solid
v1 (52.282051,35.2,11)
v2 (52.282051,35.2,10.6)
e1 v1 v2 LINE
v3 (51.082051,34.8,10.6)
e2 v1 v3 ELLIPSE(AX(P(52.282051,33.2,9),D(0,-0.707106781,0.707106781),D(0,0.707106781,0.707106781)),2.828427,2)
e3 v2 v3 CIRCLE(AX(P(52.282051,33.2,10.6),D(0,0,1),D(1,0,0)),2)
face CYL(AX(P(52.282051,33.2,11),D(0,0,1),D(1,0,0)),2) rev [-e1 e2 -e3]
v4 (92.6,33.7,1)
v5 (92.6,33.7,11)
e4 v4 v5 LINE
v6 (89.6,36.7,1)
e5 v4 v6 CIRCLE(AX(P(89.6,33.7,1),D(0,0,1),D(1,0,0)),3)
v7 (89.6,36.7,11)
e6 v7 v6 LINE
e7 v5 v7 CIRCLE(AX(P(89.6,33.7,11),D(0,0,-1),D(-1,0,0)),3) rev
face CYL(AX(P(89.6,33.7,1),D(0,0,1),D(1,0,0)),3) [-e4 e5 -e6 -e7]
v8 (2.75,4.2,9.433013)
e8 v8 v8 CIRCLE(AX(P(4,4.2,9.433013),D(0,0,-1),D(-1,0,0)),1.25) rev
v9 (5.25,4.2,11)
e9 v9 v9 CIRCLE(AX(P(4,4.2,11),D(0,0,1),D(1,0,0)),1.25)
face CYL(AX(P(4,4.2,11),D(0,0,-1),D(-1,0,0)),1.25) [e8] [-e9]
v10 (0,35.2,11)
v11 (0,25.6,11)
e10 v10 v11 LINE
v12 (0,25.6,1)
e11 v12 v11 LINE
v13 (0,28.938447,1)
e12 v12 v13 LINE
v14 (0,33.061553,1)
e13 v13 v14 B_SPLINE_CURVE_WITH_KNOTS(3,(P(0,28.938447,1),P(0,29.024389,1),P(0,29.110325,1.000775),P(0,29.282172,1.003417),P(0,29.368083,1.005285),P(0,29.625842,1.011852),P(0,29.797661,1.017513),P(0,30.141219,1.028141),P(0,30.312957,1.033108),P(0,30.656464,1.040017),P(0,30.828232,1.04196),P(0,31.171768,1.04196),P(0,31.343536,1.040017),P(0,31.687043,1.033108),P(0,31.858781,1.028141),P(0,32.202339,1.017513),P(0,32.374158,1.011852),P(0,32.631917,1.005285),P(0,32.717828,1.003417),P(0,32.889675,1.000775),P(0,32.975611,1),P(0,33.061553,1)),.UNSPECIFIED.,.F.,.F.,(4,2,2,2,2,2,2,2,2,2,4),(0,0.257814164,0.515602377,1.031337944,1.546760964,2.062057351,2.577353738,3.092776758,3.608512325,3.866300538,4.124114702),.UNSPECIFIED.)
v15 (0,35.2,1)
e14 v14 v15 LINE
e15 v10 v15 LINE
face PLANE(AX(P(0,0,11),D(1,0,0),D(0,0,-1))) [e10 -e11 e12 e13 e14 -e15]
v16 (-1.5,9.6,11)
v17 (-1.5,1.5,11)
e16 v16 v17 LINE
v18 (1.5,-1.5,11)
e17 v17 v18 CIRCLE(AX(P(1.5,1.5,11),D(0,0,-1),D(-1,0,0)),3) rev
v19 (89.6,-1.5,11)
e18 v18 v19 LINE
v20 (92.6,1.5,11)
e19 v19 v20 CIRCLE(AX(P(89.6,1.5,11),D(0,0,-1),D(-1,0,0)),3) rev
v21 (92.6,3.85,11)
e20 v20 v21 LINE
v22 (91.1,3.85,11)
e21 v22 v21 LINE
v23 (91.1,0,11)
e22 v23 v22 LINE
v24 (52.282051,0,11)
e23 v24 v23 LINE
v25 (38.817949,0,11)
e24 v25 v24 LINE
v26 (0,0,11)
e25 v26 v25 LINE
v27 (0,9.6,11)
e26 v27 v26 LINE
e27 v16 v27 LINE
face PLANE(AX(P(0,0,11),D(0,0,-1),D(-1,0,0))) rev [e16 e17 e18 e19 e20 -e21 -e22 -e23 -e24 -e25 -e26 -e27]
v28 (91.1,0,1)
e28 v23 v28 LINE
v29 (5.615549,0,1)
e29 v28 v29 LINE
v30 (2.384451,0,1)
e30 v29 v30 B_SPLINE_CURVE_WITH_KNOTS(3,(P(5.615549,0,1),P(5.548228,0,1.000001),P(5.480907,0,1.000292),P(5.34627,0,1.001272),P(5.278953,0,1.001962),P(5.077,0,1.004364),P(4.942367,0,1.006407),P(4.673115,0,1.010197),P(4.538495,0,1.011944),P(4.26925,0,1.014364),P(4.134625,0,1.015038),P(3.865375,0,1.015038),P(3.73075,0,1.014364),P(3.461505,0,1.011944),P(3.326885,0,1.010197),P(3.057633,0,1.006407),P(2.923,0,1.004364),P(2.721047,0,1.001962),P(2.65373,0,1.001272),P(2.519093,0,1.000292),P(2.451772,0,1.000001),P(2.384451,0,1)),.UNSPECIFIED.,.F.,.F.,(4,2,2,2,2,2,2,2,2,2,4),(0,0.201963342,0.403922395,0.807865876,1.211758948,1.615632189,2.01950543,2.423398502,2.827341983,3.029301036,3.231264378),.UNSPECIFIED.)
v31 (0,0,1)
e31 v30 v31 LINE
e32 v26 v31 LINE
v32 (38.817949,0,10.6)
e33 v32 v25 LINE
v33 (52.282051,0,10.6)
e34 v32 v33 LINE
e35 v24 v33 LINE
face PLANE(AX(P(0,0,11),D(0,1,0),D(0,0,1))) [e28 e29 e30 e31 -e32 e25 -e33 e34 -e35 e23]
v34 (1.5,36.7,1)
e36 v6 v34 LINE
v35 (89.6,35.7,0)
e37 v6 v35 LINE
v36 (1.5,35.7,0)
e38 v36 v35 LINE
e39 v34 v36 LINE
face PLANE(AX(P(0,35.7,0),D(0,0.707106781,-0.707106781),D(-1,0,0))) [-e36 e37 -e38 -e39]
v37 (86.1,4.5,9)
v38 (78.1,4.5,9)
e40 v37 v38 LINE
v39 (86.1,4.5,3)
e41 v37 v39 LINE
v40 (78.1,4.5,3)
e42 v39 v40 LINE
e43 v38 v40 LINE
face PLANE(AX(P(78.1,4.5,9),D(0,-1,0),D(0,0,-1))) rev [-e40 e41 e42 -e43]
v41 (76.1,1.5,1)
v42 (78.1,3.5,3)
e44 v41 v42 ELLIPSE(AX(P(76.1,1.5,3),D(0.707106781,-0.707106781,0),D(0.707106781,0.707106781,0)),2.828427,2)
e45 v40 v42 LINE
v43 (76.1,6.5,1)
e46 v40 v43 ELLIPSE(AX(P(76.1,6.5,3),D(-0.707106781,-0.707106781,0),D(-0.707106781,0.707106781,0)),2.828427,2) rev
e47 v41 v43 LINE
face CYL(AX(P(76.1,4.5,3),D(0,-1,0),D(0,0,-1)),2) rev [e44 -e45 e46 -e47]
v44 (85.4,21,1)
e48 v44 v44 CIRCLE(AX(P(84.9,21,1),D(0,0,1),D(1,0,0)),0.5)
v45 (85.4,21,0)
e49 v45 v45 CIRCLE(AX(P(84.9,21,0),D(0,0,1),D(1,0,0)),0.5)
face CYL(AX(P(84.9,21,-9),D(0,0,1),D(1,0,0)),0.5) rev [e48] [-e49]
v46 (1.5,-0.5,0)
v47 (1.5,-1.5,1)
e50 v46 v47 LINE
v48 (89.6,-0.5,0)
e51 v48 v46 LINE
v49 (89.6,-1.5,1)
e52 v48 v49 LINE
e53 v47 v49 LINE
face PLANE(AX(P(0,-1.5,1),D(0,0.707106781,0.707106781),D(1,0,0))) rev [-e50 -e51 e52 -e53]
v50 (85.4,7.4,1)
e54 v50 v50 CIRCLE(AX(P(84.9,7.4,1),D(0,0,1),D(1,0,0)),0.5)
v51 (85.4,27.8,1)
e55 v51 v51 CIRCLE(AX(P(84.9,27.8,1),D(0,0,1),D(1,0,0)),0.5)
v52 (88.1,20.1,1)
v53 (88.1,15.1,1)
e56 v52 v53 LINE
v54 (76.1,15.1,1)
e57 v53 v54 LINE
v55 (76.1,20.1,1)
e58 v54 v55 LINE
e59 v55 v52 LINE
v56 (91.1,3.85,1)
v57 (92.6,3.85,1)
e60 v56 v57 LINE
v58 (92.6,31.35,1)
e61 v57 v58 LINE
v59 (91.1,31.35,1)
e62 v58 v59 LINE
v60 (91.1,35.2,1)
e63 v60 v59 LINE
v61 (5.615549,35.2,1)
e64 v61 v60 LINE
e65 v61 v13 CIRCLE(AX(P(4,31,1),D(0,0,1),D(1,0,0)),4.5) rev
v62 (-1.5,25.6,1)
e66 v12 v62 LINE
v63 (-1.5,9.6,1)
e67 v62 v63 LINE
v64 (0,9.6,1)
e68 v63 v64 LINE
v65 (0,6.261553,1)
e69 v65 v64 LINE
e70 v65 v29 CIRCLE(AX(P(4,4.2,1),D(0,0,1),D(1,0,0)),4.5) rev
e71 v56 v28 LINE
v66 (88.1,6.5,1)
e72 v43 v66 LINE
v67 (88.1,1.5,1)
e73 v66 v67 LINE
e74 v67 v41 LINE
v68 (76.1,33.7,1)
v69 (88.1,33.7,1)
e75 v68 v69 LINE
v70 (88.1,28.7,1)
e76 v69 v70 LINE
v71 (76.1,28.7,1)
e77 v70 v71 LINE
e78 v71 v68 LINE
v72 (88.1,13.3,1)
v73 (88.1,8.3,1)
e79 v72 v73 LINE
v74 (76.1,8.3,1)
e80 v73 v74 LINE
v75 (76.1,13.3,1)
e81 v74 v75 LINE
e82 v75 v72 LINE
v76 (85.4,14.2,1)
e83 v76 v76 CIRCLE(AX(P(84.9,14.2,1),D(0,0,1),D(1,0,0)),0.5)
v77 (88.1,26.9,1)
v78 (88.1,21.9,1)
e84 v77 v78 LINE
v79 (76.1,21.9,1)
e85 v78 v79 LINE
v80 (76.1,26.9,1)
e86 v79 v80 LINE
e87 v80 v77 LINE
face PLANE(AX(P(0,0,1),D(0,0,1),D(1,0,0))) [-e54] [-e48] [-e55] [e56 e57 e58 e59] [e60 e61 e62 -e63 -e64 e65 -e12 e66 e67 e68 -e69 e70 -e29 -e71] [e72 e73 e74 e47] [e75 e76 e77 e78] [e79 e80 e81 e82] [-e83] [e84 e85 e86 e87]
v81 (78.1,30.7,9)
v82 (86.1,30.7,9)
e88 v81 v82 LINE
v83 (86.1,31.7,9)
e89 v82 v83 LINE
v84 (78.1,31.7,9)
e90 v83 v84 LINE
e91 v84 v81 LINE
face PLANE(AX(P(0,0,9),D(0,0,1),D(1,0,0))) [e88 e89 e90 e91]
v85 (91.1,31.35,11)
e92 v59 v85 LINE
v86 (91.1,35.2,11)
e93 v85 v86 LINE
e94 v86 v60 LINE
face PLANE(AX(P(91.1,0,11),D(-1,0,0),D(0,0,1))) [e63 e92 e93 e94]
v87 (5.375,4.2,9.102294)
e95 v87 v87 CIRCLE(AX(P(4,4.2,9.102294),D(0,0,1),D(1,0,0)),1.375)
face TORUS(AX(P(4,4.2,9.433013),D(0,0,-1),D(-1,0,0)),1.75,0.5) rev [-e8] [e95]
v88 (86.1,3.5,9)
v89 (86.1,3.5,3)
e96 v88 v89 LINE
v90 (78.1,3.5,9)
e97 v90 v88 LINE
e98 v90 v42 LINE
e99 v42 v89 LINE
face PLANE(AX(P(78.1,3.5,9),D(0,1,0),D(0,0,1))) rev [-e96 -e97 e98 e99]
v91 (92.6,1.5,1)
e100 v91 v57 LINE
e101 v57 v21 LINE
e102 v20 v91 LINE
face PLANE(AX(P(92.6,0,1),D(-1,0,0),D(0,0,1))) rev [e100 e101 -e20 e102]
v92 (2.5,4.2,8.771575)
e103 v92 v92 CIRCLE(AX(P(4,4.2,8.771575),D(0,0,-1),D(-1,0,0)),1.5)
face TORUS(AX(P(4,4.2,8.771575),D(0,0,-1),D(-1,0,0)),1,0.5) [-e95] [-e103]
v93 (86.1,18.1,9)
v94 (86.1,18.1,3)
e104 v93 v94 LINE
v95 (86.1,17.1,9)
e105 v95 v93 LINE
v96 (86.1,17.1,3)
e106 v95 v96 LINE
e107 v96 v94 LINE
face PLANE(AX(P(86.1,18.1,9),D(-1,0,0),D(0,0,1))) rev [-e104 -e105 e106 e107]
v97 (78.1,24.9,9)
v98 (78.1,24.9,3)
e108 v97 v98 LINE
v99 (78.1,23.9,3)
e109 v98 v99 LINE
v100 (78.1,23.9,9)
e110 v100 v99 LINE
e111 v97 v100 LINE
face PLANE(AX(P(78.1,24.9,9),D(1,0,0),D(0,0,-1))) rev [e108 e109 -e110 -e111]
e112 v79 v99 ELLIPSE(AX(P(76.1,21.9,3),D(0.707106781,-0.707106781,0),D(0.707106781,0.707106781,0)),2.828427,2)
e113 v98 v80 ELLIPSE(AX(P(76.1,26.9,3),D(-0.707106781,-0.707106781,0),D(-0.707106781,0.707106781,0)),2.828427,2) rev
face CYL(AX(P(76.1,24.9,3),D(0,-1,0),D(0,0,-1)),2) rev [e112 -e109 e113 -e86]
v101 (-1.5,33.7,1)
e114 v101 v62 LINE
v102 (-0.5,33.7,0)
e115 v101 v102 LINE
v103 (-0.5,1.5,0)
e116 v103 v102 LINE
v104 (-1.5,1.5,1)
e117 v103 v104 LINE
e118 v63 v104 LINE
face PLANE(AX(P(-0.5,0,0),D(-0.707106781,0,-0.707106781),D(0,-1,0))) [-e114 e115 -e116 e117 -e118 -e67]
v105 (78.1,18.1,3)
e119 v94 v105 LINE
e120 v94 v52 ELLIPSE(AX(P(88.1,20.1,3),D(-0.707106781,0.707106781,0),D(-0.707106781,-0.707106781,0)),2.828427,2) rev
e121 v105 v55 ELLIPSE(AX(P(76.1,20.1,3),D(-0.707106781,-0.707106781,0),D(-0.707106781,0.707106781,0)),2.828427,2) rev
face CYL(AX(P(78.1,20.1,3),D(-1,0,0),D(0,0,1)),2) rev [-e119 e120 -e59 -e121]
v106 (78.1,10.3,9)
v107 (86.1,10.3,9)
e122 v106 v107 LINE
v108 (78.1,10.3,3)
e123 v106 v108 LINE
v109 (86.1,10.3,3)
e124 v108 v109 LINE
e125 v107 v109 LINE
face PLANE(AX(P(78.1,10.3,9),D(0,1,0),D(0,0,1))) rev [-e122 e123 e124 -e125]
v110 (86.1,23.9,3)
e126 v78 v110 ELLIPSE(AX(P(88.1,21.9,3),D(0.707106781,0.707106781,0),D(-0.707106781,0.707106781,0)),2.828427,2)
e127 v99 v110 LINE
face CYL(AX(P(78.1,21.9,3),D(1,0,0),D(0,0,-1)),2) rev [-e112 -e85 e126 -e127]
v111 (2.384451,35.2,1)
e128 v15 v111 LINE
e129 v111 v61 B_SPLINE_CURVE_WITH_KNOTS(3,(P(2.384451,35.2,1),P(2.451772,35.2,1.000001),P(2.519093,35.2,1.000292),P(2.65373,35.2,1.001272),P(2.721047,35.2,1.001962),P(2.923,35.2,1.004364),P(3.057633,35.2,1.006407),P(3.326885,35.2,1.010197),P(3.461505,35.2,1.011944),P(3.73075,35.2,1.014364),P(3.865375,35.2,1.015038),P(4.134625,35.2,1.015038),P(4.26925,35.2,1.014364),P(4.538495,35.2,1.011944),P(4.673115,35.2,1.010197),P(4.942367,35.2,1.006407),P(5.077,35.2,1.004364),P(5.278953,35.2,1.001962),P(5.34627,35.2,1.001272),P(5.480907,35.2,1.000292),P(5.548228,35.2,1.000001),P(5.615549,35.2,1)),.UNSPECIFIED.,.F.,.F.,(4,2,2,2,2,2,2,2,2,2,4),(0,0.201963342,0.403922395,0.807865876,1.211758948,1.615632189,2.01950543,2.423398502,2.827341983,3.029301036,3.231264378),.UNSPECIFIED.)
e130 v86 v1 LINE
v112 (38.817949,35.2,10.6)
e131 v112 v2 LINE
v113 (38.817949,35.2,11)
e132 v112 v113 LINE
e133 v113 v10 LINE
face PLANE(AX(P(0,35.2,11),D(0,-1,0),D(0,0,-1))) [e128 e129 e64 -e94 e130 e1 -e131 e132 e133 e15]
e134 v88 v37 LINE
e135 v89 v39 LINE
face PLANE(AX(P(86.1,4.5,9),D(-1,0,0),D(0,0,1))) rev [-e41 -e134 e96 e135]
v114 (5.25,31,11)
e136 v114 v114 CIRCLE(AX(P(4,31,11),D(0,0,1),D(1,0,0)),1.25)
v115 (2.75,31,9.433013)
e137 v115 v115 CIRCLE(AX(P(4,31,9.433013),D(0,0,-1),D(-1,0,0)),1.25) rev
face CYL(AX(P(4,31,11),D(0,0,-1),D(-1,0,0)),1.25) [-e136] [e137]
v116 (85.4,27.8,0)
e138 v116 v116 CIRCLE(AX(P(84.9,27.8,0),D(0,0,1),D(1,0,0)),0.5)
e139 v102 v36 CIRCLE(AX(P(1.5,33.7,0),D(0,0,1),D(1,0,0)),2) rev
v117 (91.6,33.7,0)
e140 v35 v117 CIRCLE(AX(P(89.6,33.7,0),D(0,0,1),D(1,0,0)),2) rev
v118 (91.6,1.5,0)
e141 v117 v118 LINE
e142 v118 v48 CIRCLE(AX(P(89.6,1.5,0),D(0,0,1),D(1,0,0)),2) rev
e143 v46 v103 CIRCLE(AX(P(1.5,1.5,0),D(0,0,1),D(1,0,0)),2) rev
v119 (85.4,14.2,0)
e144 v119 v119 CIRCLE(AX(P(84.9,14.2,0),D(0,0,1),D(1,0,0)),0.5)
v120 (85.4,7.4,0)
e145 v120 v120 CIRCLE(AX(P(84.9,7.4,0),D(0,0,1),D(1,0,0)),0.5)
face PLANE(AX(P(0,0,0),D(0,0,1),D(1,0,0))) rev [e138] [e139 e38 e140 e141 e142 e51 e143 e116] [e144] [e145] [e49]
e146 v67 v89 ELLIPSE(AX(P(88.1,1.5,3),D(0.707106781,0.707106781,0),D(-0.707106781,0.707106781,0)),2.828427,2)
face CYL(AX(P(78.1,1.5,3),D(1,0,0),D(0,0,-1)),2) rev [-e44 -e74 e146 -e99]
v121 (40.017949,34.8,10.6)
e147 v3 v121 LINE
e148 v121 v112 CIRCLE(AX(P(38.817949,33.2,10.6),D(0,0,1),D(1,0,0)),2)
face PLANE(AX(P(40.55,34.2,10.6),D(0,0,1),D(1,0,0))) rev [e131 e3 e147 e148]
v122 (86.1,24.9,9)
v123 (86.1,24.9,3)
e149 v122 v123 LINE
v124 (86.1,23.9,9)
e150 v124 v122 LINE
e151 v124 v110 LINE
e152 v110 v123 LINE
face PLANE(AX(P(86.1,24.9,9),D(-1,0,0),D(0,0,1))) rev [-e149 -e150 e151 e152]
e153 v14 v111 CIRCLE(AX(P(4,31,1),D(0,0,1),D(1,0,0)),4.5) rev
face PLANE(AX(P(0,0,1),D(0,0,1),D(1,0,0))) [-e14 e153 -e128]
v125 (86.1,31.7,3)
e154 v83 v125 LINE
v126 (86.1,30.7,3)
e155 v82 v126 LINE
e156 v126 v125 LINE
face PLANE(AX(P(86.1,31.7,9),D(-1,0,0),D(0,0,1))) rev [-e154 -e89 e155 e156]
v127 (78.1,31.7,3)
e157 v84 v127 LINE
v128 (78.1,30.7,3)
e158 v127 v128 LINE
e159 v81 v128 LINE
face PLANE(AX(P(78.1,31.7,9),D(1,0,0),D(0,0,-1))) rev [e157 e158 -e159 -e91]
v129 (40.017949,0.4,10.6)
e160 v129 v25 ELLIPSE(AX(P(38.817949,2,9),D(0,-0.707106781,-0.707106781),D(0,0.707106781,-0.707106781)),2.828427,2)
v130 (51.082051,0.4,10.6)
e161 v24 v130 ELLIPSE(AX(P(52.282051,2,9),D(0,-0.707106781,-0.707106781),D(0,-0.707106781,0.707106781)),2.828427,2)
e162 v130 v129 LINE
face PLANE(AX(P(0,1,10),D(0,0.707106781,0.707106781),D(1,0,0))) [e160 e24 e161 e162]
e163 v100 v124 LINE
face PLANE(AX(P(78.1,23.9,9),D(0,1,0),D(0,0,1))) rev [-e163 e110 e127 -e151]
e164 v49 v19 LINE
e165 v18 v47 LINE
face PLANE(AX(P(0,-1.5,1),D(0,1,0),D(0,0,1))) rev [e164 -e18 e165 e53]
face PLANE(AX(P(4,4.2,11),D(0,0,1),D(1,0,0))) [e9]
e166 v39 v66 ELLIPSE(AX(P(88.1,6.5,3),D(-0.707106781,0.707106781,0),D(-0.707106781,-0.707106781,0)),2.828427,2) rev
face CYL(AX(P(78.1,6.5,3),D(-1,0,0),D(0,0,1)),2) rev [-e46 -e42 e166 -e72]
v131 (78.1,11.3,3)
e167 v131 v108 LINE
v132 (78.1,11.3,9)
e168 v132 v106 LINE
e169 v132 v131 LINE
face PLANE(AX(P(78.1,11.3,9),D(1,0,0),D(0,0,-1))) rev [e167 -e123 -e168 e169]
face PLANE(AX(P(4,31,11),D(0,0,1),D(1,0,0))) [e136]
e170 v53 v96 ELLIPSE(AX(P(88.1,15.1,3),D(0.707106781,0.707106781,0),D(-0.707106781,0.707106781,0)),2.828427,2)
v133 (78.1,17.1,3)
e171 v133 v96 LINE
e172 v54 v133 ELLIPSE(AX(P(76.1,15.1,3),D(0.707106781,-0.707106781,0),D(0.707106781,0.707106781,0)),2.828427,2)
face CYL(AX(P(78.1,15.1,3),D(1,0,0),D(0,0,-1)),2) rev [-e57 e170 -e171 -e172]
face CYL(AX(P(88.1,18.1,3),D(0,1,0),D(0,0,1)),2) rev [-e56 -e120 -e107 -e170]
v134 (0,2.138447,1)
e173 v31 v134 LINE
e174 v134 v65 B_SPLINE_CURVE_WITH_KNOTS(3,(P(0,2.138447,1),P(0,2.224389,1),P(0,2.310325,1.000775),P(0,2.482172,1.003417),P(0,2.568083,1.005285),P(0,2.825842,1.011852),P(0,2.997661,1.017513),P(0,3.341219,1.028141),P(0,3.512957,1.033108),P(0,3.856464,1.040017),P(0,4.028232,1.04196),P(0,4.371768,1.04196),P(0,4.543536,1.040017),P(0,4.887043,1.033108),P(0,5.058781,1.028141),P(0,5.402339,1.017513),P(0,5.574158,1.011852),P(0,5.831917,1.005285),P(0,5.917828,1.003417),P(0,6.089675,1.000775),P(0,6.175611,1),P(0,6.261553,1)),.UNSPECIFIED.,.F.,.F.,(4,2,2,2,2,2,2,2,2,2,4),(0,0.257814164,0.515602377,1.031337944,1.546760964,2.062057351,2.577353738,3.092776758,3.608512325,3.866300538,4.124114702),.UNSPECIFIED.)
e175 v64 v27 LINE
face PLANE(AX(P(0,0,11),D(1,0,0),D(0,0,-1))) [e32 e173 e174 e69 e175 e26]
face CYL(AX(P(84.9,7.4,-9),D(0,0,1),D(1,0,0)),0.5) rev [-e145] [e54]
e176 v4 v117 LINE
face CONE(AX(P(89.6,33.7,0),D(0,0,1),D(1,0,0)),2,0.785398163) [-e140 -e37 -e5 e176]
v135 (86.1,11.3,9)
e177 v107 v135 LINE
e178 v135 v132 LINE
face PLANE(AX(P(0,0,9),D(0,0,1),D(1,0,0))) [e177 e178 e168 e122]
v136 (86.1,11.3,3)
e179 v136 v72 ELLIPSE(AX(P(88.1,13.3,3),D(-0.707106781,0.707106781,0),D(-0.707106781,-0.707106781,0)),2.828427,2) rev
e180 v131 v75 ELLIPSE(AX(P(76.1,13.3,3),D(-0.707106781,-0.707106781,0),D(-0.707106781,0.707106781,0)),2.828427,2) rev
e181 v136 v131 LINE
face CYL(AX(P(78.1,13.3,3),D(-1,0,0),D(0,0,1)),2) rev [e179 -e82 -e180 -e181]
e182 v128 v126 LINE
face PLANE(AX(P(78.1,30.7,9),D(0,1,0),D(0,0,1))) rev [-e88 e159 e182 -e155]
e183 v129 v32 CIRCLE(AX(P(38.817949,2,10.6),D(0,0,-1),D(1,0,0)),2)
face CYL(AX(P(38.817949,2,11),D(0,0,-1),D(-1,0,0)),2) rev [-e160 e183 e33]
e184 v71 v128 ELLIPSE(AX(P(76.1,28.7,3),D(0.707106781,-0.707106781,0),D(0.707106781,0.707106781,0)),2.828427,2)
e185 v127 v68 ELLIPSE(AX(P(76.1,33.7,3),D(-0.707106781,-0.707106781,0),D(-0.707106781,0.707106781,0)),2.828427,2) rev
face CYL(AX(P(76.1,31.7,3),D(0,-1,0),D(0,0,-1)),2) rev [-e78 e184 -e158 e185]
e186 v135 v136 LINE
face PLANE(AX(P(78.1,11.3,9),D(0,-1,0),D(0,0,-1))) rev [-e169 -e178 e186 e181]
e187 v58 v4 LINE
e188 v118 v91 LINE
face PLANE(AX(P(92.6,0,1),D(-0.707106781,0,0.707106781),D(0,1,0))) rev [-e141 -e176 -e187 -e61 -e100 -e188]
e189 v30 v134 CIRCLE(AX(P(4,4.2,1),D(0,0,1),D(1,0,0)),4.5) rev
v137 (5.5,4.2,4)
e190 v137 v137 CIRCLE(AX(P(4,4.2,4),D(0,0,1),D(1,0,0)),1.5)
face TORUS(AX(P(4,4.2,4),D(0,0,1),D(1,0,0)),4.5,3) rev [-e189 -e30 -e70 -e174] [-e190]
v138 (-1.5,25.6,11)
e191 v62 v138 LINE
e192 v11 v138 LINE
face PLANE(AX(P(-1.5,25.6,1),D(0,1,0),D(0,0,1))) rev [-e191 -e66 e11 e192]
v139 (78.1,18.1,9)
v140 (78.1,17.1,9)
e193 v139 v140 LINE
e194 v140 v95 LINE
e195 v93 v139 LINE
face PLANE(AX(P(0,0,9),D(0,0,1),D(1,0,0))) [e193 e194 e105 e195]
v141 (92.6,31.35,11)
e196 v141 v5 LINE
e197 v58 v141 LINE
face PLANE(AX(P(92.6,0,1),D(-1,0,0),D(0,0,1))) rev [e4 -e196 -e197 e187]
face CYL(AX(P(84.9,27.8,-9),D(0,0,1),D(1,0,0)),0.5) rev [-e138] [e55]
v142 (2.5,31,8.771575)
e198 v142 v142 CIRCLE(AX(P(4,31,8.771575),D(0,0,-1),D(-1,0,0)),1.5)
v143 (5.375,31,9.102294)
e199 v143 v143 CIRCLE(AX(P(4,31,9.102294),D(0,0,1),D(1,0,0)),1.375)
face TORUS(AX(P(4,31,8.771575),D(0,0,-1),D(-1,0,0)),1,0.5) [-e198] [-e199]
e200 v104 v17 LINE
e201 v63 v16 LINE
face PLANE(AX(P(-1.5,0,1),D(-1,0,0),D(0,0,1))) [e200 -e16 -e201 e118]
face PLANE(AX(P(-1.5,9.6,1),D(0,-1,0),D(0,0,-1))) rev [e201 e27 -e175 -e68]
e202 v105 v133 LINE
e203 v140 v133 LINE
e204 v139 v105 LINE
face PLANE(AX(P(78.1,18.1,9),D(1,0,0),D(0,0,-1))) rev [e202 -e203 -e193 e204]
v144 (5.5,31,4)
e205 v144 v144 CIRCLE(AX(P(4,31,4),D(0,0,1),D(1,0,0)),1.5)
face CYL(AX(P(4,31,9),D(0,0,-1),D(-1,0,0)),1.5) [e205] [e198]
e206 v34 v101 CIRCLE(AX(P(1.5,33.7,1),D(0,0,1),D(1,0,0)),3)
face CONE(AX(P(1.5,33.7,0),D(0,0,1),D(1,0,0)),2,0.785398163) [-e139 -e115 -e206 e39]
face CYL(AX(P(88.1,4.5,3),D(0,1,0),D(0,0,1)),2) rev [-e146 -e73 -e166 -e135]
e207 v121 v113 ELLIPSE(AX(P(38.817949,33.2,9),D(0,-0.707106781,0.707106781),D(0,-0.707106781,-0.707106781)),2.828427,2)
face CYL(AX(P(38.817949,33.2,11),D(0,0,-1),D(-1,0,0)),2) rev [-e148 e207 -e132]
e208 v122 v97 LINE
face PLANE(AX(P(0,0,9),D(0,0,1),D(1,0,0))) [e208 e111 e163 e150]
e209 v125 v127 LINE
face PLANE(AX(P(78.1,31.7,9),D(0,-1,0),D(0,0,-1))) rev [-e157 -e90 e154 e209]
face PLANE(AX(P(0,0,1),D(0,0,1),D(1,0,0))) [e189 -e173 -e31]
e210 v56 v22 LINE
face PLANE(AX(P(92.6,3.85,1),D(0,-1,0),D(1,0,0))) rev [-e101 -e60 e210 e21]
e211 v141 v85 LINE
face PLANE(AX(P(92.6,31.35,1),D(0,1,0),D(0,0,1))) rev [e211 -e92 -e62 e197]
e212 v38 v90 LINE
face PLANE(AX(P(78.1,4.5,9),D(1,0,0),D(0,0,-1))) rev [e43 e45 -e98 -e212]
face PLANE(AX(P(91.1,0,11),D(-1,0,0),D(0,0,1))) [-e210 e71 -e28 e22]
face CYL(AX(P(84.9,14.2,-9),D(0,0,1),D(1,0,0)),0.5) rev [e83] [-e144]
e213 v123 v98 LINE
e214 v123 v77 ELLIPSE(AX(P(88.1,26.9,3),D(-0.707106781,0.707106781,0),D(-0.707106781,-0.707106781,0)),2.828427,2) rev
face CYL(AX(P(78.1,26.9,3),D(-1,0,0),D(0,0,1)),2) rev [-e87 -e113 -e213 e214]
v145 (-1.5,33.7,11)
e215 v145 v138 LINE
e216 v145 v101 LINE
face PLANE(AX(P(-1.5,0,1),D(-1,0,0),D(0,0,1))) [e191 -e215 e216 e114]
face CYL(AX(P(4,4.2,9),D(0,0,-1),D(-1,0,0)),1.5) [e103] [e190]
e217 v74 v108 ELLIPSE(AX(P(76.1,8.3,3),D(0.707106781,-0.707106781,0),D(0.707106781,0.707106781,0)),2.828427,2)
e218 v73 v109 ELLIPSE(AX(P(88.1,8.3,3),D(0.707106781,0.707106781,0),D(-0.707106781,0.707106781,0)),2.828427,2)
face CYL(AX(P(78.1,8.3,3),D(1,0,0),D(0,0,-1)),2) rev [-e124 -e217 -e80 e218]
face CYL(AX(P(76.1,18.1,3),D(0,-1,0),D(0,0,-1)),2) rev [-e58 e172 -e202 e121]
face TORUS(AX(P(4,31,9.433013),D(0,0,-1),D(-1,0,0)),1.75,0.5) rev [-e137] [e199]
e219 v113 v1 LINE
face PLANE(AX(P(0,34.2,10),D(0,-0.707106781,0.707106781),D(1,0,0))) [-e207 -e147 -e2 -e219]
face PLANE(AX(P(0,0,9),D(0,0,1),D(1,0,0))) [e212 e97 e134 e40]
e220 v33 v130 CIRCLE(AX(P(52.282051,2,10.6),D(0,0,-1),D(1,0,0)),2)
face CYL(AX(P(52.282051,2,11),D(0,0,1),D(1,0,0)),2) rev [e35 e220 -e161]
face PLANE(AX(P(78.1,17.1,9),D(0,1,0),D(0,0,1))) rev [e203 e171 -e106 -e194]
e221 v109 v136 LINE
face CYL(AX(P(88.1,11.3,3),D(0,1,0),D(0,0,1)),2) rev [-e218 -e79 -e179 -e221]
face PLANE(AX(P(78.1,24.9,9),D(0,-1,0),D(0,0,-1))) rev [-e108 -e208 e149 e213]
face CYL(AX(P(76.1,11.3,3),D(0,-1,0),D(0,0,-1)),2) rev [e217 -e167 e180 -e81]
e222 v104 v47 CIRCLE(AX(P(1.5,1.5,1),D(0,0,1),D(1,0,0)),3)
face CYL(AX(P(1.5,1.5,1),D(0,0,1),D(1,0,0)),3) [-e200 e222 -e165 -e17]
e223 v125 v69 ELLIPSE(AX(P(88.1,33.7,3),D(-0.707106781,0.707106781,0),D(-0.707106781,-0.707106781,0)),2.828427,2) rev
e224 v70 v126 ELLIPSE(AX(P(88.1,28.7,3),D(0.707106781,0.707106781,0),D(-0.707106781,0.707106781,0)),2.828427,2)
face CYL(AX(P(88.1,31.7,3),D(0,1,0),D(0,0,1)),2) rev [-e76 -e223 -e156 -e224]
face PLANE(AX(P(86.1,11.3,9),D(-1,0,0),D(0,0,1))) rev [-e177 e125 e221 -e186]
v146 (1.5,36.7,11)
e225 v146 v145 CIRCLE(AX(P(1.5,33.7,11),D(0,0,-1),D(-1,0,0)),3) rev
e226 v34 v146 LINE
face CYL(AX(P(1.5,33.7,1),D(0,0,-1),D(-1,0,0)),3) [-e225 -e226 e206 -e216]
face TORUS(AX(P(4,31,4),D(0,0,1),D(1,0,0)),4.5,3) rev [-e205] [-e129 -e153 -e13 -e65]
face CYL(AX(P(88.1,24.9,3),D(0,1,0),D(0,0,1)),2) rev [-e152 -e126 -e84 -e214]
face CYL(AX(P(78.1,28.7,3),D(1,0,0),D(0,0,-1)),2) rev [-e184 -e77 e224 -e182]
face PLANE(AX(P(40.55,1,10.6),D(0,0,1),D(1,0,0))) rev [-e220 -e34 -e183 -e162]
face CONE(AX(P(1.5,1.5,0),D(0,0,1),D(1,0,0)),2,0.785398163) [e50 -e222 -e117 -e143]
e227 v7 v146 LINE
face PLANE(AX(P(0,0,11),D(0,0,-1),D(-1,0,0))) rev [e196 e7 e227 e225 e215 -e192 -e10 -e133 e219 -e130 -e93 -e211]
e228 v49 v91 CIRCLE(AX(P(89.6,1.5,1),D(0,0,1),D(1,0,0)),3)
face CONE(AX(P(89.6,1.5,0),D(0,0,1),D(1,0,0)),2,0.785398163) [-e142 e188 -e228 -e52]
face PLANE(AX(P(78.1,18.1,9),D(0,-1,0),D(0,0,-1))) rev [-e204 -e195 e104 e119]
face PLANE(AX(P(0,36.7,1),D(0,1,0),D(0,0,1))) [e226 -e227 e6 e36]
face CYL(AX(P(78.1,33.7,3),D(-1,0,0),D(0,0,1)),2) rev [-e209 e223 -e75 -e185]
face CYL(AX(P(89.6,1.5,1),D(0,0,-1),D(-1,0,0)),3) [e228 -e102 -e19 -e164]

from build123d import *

# Parameters (mm, degrees)
SKETCH1_W                = 94.1
SKETCH1_H                = 38.2
SKETCH1_W_2              = 91.1
SKETCH1_H_2              = 35.2
BOSS_EXTRUDE1_DEPTH      = 1
SKETCH1_3_W              = 94.1
SKETCH1_3_H              = 38.2
SKETCH1_3_W_2            = 91.1
SKETCH1_3_H_2            = 35.2
BOSS_EXTRUDE2_DEPTH      = 11
SKETCH2_W                = 1.5
SKETCH2_H                = 16
SKETCH2_H_2              = 27.5
CUT_EXTRUDE1_DEPTH       = 10
SKETCH3_W                = 8
SKETCH3_H                = 1
BOSS_EXTRUDE3_DEPTH      = 8
SKETCH4_R                = 0.5
CUT_EXTRUDE2_DEPTH       = 10
SKETCH5_R                = 1.5
BOSS_EXTRUDE4_DEPTH      = 8
SKETCH7_R                = 1.25
BOSS_EXTRUDE6_DEPTH      = 2
FILLET1_R                = 3
FILLET2_R                = 2
FILLET3_R                = 3
CHAMFER2_SIZE            = 1
SKETCH6_W                = 10
SKETCH6_H                = 0.4
BOSS_EXTRUDE5_DEPTH      = 1
FILLET4_R                = 2
CHAMFER3_SIZE            = 1
FILLET5_R                = 0.5
FILLET6_R                = 0.5
FILLET4_OF_MIRROR2_R     = 2
CHAMFER3_OF_MIRROR2_SIZE = 1


# Some blends are built 0.0001 mm under size
with BuildPart() as part:
    # Sketch1 → Boss-Extrude1 (new body)
    # profile 1 of 2: a face of its own
    with BuildSketch(Plane.XY):
        with Locations((45.55, 17.6)):
            Rectangle(SKETCH1_W, SKETCH1_H)
        with Locations((45.55, 17.6)):
            Rectangle(SKETCH1_W_2, SKETCH1_H_2, mode=Mode.SUBTRACT)
    # profile 2 of 2: a face of its own
    with BuildSketch(Plane.XY):
        with Locations((45.55, 17.6)):
            Rectangle(SKETCH1_W_2, SKETCH1_H_2)
    extrude(amount=BOSS_EXTRUDE1_DEPTH)

    # Sketch1<3> → Boss-Extrude2 (add)
    with BuildSketch(Plane.XY):
        with Locations((45.55, 17.6)):
            Rectangle(SKETCH1_3_W, SKETCH1_3_H)
        with Locations((45.55, 17.6)):
            Rectangle(SKETCH1_3_W_2, SKETCH1_3_H_2, mode=Mode.SUBTRACT)
    extrude(amount=BOSS_EXTRUDE2_DEPTH)

    # Sketch2 → Cut-Extrude1 (cut)
    with BuildSketch(Plane.XY.offset(11)):
        with Locations((-0.75, 17.6)):
            Rectangle(SKETCH2_W, SKETCH2_H)
        with Locations((91.85, 17.6)):
            Rectangle(SKETCH2_W, SKETCH2_H_2)
    extrude(amount=-CUT_EXTRUDE1_DEPTH, mode=Mode.SUBTRACT)

    # Sketch3 → Boss-Extrude3 (add)
    with BuildSketch(Plane.XY.offset(1)):
        with Locations((82.1, 31.2)):
            Rectangle(SKETCH3_W, SKETCH3_H)
        with Locations((82.1, 24.4)):
            Rectangle(SKETCH3_W, SKETCH3_H)
        with Locations((82.1, 17.6)):
            Rectangle(SKETCH3_W, SKETCH3_H)
        with Locations((82.1, 10.8)):
            Rectangle(SKETCH3_W, SKETCH3_H)
        with Locations((82.1, 4)):
            Rectangle(SKETCH3_W, SKETCH3_H)
    extrude(amount=BOSS_EXTRUDE3_DEPTH)

    # Sketch4 → Cut-Extrude2 (cut)
    with BuildSketch(Plane.XY.offset(1)):
        with Locations((84.9, 27.8)):
            Circle(SKETCH4_R)
        with Locations((84.9, 21)):
            Circle(SKETCH4_R)
        with Locations((84.9, 14.2)):
            Circle(SKETCH4_R)
        with Locations((84.9, 7.4)):
            Circle(SKETCH4_R)
    extrude(amount=-CUT_EXTRUDE2_DEPTH, mode=Mode.SUBTRACT)

    # Sketch5 → Boss-Extrude4 (add)
    with BuildSketch(Plane.XY.offset(1)):
        with Locations((4, 31)):
            Circle(SKETCH5_R)
        with Locations((4, 4.2)):
            Circle(SKETCH5_R)
    extrude(amount=BOSS_EXTRUDE4_DEPTH)

    # Sketch7 → Boss-Extrude6 (add)
    with BuildSketch(Plane.XY.offset(9)):
        with Locations((4, 31)):
            Circle(SKETCH7_R)
        with Locations((4, 4.2)):
            Circle(SKETCH7_R)
    extrude(amount=BOSS_EXTRUDE6_DEPTH)

    # Fillet1
    # the kernel refuses this fillet: 3 mm, written as the material it adds along each edge
    with BuildSketch(Plane(origin=(4, 31, 1), x_dir=(1, 0, 0), z_dir=(0, -1, 0))) as fillet1_piece_1:
        with BuildLine():
            CenterArc((1.5 + FILLET1_R, FILLET1_R), FILLET1_R, 180, 90)
            Line((1.5, FILLET1_R), (1.5, 0))
            Line((1.5, 0), (1.5 + FILLET1_R, 0))
        make_face()
    revolve(axis=Axis((4, 31, 1), (0, 0, 1)))
    with BuildSketch(Plane(origin=(4, 4.2, 1), x_dir=(1, 0, 0), z_dir=(0, -1, 0))) as fillet1_piece_2:
        with BuildLine():
            CenterArc((1.5 + FILLET1_R, FILLET1_R), FILLET1_R, 180, 90)
            Line((1.5, FILLET1_R), (1.5, 0))
            Line((1.5, 0), (1.5 + FILLET1_R, 0))
        make_face()
    revolve(axis=Axis((4, 4.2, 1), (0, 0, 1)))

    # Fillet2
    fillet2_edges = [part.edges().sort_by_distance(p)[0] for p in [
        (78.1, 17.6, 1),
        (82.1, 17.1, 1),
        (86.1, 17.6, 1),
        (82.1, 18.1, 1),
        (78.1, 10.8, 1),
        (82.1, 10.3, 1),
        (86.1, 10.8, 1),
        (82.1, 11.3, 1),
        (78.1, 4, 1),
        (82.1, 3.5, 1),
        (86.1, 4, 1),
        (82.1, 4.5, 1),
        (78.1, 31.2, 1),
        (82.1, 30.7, 1),
        (86.1, 31.2, 1),
        (82.1, 31.7, 1),
        (78.1, 24.4, 1),
        (82.1, 23.9, 1),
        (86.1, 24.4, 1),
        (82.1, 24.9, 1),
    ]]
    fillet(fillet2_edges, radius=FILLET2_R)

    # Fillet3
    fillet3_edges = [part.edges().sort_by_distance(p)[0] for p in [
        (-1.5, 36.7, 5.5),
        (92.6, 36.7, 5.5),
        (92.6, -1.5, 5.5),
        (-1.5, -1.5, 5.5),
    ]]
    fillet(fillet3_edges, radius=FILLET3_R)

    # Chamfer2
    chamfer2_edges = [part.edges().sort_by_distance(p)[0] for p in [
        (-1.5, 17.6, 0),
        (45.55, 36.7, 0),
        (92.6, 17.6, 0),
        (45.55, -1.5, 0),
        (91.721320344, -0.621320344, 0),
        (-0.621320344, -0.621320344, 0),
        (91.721320344, 35.821320344, 0),
        (-0.621320344, 35.821320344, 0),
    ]]
    chamfer(chamfer2_edges, length=CHAMFER2_SIZE - 0.0001)  # a hair under: the kernel refuses the full size

    # Sketch6 → Boss-Extrude5 (add)
    with BuildSketch(Plane.XZ.offset(-35.2)):
        with Locations((45.55, 10.8)):
            Rectangle(SKETCH6_W, SKETCH6_H)
    boss_extrude5 = extrude(amount=BOSS_EXTRUDE5_DEPTH)

    # Fillet4
    # the kernel refuses this fillet: 2 mm, written as the material it adds along each edge
    with BuildSketch(Plane(origin=(40.55, 35.2, 10.6), x_dir=(-1, 0, 0), z_dir=(0, 0, 1)), Plane(origin=(50.55, 35.2, 11), x_dir=(1, 0, 0), z_dir=(0, 0, -1))) as fillet4_piece_1:
        with BuildLine():
            CenterArc((1.732050808, 2), FILLET4_R, 210, 60)
            Line((0, 1), (-0.034641016, 0.98))
            ThreePointArc((-0.034641016, 0.98), (-0.04, 0.5), (-0.04, 0))
            Line((-0.04, 0), (0, -0.04))
            Line((0, -0.04), (1.732050808, -0.04))
            Line((1.732050808, -0.04), (1.732050808, 0))
        make_face()
    extrude(amount=0.4)

    # Chamfer3
    # the kernel refuses this chamfer: 1 mm, written as the material it takes off along each edge
    with BuildSketch(Plane(origin=(37.978317012, 34.2, 11), x_dir=(0, 0.9996219169112968, 0.02749587661058555), z_dir=(1, 0, 0))) as chamfer3_piece_1:
        Polygon((CHAMFER3_SIZE * 0.999621916911, -CHAMFER3_SIZE * 0.0274958766106), (-CHAMFER3_SIZE * 0.0274958766106, -CHAMFER3_SIZE * 0.999621916911), (0, 0), align=None)
    extrude(amount=15.143365976, mode=Mode.SUBTRACT)

    # Fillet5
    # the kernel refuses this fillet: 0.5 mm, written as the material it adds along each edge
    with BuildSketch(Plane(origin=(4, 31, 9), x_dir=(1, 0, 0), z_dir=(0, -1, 0))) as fillet5_piece_1:
        with BuildLine():
            CenterArc((1.75, 0.433012702), FILLET5_R, 180, 60)
            Line((1.25, 0.433012702), (1.24, 0.433012702))
            Line((1.24, 0.433012702), (1.24, 0))
            Line((1.24, 0), (1.25, -0.01))
            ThreePointArc((1.25, -0.01), (1.375, -0.01), (1.495, -0.008660254))
            Line((1.495, -0.008660254), (1.5, 0))
        make_face()
    revolve(axis=Axis((4, 31, 9), (0, 0, 1)))
    with BuildSketch(Plane(origin=(4, 4.2, 9), x_dir=(1, 0, 0), z_dir=(0, -1, 0))) as fillet5_piece_2:
        with BuildLine():
            CenterArc((1.75, 0.433012702), FILLET5_R, 180, 60)
            Line((1.25, 0.433012702), (1.24, 0.433012702))
            Line((1.24, 0.433012702), (1.24, 0))
            Line((1.24, 0), (1.25, -0.01))
            ThreePointArc((1.25, -0.01), (1.375, -0.01), (1.495, -0.008660254))
            Line((1.495, -0.008660254), (1.5, 0))
        make_face()
    revolve(axis=Axis((4, 4.2, 9), (0, 0, 1)))

    # Fillet6
    fillet6_edges = [part.edges().sort_by_distance(p)[0] for p in [
        (2.5, 31, 9),
        (2.5, 4.2, 9),
    ]]
    fillet(fillet6_edges, radius=FILLET6_R)

    # Mirror2: Boss-Extrude5 across plane
    add(boss_extrude5.mirror(Plane(origin=(0, 17.6, 0), x_dir=(0, 0, 1), z_dir=(0, -1, 0))))

    # Fillet4 of Mirror2
    # the kernel refuses this fillet: 2 mm, written as the material it adds along each edge
    with BuildSketch(Plane(origin=(40.55, 0, 10.6), x_dir=(-1, 0, 0), z_dir=(0, 0, 1)), Plane(origin=(50.55, 0, 11), x_dir=(1, 0, 0), z_dir=(0, 0, -1))) as fillet4_of_mirror2_piece_1:
        with BuildLine():
            CenterArc((1.732050808, -2), FILLET4_OF_MIRROR2_R, 90, 60)
            Line((0, -1), (-0.034641016, -0.98))
            ThreePointArc((-0.034641016, -0.98), (-0.04, -0.5), (-0.04, 0))
            Line((-0.04, 0), (0, 0.04))
            Line((0, 0.04), (1.732050808, 0.04))
            Line((1.732050808, 0.04), (1.732050808, 0))
        make_face()
    extrude(amount=0.4)

    # Chamfer3 of Mirror2
    # the kernel refuses this chamfer: 1 mm, written as the material it takes off along each edge
    with BuildSketch(Plane(origin=(37.978317012, 1, 11), x_dir=(0, -0.9996219169112968, 0.02749587661058563), z_dir=(1, 0, 0))) as chamfer3_of_mirror2_piece_1:
        Polygon((CHAMFER3_OF_MIRROR2_SIZE * 0.999621916911, CHAMFER3_OF_MIRROR2_SIZE * 0.0274958766106), (-CHAMFER3_OF_MIRROR2_SIZE * 0.0274958766106, CHAMFER3_OF_MIRROR2_SIZE * 0.999621916911), (0, 0), align=None)
    extrude(amount=15.143365976, mode=Mode.SUBTRACT)


solid = part.part
